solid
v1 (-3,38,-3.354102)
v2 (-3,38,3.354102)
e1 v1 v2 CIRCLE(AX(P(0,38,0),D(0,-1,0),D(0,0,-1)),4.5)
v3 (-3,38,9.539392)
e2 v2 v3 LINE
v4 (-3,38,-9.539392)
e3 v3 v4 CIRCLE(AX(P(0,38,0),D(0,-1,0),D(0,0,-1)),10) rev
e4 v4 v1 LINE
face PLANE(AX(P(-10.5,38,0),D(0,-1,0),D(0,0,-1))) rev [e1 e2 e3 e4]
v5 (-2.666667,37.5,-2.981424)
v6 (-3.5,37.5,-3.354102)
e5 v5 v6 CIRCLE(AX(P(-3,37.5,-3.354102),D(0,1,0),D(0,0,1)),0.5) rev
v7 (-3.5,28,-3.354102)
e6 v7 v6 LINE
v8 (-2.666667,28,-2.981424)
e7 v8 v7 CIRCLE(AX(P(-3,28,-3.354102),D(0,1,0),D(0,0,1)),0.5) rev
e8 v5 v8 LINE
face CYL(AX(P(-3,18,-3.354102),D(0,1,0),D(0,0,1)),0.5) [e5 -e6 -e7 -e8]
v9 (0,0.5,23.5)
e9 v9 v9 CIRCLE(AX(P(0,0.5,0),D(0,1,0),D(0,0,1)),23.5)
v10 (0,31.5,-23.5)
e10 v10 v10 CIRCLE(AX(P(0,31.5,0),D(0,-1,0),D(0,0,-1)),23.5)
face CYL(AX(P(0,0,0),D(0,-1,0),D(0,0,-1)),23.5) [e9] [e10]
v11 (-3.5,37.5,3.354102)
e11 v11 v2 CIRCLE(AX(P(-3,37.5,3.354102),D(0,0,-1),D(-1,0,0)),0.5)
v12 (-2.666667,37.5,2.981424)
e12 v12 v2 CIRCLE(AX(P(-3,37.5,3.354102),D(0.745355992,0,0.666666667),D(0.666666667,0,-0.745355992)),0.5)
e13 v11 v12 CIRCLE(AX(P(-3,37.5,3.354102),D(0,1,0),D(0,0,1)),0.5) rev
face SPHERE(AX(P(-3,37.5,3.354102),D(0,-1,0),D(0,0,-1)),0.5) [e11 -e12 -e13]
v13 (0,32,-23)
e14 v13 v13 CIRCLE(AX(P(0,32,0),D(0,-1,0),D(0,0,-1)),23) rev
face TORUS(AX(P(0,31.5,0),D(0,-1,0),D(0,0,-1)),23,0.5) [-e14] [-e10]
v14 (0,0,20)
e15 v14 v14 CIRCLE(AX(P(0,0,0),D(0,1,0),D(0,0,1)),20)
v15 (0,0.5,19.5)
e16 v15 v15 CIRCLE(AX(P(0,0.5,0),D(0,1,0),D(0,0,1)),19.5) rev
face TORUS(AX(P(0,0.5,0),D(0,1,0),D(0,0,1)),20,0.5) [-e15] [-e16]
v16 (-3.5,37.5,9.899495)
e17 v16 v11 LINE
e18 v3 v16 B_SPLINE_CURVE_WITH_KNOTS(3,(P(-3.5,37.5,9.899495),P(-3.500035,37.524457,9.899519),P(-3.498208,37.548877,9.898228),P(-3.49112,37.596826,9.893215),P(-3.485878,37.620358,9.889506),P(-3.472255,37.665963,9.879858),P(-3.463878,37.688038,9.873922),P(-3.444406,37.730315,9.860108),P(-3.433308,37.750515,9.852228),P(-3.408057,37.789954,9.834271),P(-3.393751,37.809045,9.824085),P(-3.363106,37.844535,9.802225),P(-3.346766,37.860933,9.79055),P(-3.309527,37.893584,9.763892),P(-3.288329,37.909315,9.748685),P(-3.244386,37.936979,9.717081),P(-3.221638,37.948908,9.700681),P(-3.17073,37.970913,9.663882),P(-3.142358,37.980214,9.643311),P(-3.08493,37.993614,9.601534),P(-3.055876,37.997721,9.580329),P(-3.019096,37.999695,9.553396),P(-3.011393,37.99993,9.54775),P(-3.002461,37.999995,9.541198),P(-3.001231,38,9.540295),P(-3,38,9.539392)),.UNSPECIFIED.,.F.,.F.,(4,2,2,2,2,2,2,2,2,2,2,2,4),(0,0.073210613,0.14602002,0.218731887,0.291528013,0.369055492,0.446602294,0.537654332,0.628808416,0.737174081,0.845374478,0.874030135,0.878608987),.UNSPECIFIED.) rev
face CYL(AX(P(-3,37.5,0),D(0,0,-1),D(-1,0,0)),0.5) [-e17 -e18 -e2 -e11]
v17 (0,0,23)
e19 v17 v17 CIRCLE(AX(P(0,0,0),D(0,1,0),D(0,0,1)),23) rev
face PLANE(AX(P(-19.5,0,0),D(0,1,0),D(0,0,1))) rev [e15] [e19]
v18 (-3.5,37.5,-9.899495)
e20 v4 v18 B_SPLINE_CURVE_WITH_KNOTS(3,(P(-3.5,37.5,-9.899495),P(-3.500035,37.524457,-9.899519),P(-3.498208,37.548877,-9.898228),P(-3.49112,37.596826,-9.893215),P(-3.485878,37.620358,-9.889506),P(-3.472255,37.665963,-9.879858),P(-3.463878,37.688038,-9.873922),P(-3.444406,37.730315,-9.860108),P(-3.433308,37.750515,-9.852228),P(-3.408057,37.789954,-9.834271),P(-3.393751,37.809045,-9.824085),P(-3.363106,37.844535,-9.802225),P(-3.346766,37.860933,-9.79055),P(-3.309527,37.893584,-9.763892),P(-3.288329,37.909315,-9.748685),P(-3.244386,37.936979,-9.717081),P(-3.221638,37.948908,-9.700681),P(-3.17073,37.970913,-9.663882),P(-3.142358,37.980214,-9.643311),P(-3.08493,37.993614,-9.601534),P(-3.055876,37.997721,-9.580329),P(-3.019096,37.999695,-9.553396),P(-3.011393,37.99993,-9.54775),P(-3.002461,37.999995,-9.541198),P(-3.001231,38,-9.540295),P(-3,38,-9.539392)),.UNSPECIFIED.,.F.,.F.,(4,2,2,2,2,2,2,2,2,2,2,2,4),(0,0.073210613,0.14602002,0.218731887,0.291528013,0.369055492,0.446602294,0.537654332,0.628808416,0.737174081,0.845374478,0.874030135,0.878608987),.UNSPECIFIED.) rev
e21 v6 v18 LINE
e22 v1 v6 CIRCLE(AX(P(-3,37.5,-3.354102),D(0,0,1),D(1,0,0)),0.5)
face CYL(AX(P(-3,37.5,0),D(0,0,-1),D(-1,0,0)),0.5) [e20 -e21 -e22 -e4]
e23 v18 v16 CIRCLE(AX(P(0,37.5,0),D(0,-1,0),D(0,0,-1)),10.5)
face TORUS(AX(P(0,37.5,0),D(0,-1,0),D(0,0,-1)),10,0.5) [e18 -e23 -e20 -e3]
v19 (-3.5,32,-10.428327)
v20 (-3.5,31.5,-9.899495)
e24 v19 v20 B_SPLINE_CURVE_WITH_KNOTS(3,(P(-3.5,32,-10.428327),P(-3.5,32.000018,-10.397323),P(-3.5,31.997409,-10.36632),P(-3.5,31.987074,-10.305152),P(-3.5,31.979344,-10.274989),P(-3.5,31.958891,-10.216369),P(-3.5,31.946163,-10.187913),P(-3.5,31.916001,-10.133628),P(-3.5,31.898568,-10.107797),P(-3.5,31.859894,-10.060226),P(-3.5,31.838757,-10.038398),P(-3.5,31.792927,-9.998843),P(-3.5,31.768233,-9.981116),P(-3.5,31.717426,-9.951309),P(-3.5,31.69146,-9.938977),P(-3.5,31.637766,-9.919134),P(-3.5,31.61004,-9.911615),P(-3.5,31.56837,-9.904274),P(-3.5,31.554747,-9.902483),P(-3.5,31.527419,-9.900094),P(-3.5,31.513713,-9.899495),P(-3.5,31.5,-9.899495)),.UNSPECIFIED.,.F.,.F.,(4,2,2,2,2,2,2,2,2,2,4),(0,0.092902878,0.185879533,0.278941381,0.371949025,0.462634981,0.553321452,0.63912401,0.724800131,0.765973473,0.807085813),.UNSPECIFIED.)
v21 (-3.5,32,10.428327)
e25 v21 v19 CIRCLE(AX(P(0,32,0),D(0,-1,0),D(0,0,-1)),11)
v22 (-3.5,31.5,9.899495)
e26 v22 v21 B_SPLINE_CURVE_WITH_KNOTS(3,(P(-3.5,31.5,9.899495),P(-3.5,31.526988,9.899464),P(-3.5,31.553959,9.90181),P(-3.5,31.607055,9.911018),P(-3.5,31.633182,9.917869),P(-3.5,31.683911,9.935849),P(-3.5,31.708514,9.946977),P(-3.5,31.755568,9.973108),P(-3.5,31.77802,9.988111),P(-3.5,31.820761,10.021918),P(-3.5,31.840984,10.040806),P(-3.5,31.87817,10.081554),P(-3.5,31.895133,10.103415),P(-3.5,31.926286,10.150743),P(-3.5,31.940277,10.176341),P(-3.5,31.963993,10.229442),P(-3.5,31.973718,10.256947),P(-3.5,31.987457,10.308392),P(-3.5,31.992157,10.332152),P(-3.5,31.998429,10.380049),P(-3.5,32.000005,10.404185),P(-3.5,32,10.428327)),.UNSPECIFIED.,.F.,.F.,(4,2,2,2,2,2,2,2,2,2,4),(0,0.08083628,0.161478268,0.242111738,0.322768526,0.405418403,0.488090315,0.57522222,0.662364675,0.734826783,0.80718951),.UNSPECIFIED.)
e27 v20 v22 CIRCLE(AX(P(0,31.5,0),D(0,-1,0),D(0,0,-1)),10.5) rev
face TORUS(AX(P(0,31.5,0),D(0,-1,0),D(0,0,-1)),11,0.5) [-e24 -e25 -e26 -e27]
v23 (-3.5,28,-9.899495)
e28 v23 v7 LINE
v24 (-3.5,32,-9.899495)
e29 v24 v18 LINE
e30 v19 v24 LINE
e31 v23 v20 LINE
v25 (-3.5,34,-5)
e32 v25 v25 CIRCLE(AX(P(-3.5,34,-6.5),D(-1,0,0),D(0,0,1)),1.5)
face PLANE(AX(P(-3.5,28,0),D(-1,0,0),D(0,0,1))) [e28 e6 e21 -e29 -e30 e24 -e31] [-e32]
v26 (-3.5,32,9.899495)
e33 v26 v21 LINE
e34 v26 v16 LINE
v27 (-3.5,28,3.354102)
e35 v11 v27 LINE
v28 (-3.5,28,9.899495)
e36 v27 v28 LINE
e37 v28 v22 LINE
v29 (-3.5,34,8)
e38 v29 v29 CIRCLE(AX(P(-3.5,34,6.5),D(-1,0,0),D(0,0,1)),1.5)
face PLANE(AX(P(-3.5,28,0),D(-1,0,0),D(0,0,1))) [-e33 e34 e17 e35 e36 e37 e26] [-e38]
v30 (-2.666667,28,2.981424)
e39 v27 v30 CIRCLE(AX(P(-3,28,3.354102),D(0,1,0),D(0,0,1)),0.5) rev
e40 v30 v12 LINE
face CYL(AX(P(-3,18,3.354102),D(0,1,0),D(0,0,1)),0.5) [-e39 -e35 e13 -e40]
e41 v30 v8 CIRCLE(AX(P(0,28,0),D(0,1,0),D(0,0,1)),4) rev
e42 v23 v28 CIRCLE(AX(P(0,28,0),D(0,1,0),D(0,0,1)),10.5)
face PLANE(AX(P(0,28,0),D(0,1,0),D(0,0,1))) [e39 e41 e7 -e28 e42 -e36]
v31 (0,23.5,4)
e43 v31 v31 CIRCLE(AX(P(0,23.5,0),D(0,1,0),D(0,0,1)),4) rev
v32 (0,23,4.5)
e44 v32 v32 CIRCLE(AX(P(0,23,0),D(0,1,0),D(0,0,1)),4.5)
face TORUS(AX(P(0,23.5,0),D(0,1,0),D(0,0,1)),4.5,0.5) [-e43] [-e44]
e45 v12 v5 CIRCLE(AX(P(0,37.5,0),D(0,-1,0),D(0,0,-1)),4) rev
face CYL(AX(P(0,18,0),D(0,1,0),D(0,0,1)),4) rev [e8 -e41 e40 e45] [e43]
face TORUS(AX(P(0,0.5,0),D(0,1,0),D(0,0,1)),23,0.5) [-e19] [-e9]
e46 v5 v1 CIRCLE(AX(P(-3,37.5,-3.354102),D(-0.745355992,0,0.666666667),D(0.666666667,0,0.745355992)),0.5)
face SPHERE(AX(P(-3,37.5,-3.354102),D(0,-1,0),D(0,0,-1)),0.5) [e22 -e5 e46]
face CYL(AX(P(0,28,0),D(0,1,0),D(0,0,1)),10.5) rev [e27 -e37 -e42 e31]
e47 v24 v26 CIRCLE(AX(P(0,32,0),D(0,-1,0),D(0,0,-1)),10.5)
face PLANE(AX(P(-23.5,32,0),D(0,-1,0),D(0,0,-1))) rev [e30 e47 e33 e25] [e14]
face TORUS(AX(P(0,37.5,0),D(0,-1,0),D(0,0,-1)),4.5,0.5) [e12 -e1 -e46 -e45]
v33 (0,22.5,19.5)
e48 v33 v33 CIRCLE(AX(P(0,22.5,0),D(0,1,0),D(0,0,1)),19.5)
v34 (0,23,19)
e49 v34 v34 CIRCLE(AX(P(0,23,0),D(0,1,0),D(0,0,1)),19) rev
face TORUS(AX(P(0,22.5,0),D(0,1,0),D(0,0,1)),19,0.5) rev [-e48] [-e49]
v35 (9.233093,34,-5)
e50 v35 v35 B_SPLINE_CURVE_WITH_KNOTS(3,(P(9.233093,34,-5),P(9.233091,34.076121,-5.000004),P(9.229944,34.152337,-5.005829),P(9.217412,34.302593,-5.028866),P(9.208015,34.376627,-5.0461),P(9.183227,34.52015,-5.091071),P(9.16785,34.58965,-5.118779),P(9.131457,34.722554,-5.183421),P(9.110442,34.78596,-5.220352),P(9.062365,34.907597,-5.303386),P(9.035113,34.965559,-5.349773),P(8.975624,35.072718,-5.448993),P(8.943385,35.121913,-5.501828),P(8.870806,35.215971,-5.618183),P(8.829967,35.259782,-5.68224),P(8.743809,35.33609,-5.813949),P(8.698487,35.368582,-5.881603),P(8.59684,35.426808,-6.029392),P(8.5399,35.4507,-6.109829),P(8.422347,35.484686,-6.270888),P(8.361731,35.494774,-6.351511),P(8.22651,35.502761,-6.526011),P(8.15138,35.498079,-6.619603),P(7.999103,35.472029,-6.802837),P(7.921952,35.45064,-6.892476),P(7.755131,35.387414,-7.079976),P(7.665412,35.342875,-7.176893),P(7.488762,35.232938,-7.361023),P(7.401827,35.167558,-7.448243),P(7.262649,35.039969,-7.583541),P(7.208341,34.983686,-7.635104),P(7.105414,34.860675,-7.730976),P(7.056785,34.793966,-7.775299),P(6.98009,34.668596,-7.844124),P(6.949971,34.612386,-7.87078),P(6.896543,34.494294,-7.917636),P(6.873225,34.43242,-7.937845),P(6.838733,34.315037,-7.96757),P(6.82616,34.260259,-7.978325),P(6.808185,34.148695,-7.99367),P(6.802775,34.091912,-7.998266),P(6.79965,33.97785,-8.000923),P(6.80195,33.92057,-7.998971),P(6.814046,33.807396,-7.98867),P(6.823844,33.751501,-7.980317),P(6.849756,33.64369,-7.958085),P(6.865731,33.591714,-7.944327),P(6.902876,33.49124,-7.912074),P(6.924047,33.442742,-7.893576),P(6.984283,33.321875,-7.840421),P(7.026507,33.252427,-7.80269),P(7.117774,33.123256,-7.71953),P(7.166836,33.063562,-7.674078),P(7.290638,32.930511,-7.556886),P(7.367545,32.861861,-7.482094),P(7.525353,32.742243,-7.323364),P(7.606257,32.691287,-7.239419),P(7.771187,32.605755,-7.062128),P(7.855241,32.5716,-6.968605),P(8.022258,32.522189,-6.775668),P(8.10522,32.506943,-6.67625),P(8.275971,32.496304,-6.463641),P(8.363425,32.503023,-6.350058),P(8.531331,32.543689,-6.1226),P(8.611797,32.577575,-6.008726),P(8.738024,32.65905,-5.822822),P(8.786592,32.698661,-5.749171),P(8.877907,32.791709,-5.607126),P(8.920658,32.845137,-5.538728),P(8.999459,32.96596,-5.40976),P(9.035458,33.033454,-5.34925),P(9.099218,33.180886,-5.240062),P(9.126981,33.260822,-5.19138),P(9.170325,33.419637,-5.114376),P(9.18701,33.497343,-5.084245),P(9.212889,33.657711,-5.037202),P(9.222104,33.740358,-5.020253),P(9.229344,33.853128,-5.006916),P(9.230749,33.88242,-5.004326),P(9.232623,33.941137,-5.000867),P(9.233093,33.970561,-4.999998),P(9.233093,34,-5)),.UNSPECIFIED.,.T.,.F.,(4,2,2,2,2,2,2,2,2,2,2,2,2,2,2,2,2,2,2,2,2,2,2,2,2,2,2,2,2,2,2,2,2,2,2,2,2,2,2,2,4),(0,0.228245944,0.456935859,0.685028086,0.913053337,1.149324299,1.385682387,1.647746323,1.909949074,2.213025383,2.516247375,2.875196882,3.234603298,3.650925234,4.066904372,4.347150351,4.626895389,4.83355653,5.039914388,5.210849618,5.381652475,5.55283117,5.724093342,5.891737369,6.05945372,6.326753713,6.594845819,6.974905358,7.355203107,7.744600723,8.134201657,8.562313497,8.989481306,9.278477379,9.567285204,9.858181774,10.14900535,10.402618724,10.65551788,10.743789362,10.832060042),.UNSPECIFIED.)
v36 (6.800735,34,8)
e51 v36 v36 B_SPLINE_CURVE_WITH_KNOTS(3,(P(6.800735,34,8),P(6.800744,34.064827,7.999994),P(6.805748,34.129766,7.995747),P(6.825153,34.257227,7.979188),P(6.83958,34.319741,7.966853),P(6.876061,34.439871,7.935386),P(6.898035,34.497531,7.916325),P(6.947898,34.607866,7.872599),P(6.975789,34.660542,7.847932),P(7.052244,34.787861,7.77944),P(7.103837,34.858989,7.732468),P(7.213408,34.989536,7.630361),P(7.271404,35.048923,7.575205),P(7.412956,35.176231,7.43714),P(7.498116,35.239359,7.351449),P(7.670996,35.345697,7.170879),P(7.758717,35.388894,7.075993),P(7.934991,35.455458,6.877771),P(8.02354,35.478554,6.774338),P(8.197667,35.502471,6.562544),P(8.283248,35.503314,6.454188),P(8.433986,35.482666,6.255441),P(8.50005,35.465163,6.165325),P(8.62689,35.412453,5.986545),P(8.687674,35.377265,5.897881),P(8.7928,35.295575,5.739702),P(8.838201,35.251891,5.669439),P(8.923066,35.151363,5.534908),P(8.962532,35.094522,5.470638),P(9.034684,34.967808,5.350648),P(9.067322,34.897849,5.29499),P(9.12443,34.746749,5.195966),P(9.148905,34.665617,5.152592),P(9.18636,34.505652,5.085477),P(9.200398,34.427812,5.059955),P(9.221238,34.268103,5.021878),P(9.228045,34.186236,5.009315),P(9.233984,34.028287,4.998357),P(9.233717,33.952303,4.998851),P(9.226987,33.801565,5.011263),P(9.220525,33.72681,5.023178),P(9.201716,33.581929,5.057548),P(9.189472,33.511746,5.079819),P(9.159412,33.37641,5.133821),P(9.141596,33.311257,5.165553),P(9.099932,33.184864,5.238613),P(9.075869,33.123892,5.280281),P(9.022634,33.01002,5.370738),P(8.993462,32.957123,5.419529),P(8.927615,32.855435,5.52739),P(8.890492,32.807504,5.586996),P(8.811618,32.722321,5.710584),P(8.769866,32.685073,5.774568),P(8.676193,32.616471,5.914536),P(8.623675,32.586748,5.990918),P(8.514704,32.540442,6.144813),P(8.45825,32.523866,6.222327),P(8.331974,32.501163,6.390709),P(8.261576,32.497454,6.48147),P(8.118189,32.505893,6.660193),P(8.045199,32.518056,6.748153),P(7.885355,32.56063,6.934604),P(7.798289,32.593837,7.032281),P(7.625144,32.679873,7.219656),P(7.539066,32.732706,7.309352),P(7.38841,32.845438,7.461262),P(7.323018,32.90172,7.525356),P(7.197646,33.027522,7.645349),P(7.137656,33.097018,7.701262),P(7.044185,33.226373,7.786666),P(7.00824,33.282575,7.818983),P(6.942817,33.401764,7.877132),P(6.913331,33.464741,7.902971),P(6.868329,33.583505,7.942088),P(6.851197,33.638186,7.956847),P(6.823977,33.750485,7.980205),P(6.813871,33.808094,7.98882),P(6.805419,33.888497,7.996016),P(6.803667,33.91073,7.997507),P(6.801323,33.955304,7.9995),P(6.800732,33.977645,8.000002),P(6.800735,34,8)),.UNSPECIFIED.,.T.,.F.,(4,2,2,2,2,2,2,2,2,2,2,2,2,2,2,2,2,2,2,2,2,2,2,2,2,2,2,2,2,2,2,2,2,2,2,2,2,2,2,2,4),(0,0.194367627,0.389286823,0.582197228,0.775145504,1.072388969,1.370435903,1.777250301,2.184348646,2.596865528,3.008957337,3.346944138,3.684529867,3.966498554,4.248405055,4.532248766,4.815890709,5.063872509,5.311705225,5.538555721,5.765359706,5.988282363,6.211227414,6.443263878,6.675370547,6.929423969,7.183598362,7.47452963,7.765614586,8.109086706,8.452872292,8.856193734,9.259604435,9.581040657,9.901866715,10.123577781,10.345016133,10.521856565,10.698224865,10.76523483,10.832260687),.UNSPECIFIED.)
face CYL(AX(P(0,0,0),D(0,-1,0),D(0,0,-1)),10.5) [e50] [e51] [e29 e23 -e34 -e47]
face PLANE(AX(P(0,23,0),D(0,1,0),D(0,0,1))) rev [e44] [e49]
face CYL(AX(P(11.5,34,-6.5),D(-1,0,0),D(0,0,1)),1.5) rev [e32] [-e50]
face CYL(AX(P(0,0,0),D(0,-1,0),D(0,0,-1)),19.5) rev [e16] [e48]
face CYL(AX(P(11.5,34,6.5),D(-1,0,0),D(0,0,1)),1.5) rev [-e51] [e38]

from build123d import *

# Parameters (mm, degrees)
ESQUISSE2_R             = 4
ENL_V_MAT_EXTRU_1_DEPTH = 20
ENL_V_MAT_EXTRU_2_DEPTH = 10
ESQUISSE5_R             = 1.5
ENL_V_MAT_EXTRU_3_DEPTH = 15
CONG_1_R                = 0.5
CONG_2_R                = 0.5


with BuildPart() as part:
    # Esquisse1 → Révolution1 (revolve)
    with BuildSketch(Plane.XY, mode=Mode.PRIVATE) as r_volution1_sk:
        Polygon((-19.5, 0), (-23.5, 0), (-23.5, 32), (-10.5, 32), (-10.5, 38), (0, 38), (0, 23), (-19.5, 23), align=None)
    revolve(r_volution1_sk.sketch.rotate(Axis((0, 0, 0), (0, 1, 0)), 270), axis=Axis((0, 0, 0), (0, 1, 0)))

    # Esquisse2 → Enlèv. mat.-Extru.1 (cut)
    with BuildSketch(Plane(origin=(0, 38, 0), x_dir=(1, 0, 0), z_dir=(0, 1, 0))):
        with Locations(Location((0, 0, 0), (0, 0, 270))):
            Circle(ESQUISSE2_R)
    extrude(amount=-ENL_V_MAT_EXTRU_1_DEPTH, mode=Mode.SUBTRACT)

    # Esquisse3 → Enlèv. mat.-Extru.2 (cut)
    with BuildSketch(Plane(origin=(0, 38, 0), x_dir=(1, 0, 0), z_dir=(0, 1, 0))):
        with BuildLine():
            Line((-3.5, 1.936491673), (-3.5, 9.899494937))
            ThreePointArc((-3.5, 9.899494937), (-10.5, 0), (-3.5, -9.899494937))
            Line((-3.5, -9.899494937), (-3.5, -1.936491673))
            ThreePointArc((-3.5, -1.936491673), (-4, 0), (-3.5, 1.936491673))
        make_face()
    extrude(amount=-ENL_V_MAT_EXTRU_2_DEPTH, mode=Mode.SUBTRACT)

    # Esquisse5 → Enlèv. mat.-Extru.3 (cut)
    with BuildSketch(Plane.ZY.offset(3.5)):
        with Locations((-6.5, 34)):
            Circle(ESQUISSE5_R)
        with Locations((6.5, 34)):
            Circle(ESQUISSE5_R)
    extrude(amount=-ENL_V_MAT_EXTRU_3_DEPTH, mode=Mode.SUBTRACT)

    # Congé1
    cong_1_edges = [part.edges().sort_by_distance(p)[0] for p in [
        (-3.5, 33, -1.936491673),
        (-3.5, 33, 1.936491673),
    ]]
    fillet(cong_1_edges, radius=CONG_1_R)

    # Congé2
    # the kernel refuses this fillet: 0.5 mm, written as the material it adds along each edge
    with BuildSketch(Plane(origin=(0, 23, 0), x_dir=(0, 0, -1), z_dir=(1, 0, 0))) as cong_2_piece_1:
        with BuildLine():
            CenterArc((19.5 - CONG_2_R, -CONG_2_R), CONG_2_R, 0, 90)
            Line((19.5 - CONG_2_R, 0), (19.5, 0))
            Line((19.5, 0), (19.5, -CONG_2_R))
        make_face()
    revolve(axis=Axis((0, 23, 0), (0, 1, 0)))
    # the kernel refuses this fillet: 0.5 mm, written as the material it takes off along each edge
    with BuildSketch(Plane(origin=(0, 23, 0), x_dir=(0, 0, 1), z_dir=(-1, 0, 0))) as cong_2_2_piece_1:
        with BuildLine():
            CenterArc((4 + CONG_2_R, CONG_2_R), CONG_2_R, 180, 90)
            Line((4 + CONG_2_R, 0), (4, 0))
            Line((4, 0), (4, CONG_2_R))
        make_face()
    revolve(axis=Axis((0, 23, 0), (0, 1, 0)), mode=Mode.SUBTRACT)
    with BuildSketch(Plane(origin=(0, 38, 0), x_dir=(-0.4432023779000481, 0, -0.8964215817480875), z_dir=(-0.8964215817480875, 0, 0.4432023779000481))) as cong_2_2_piece_2:
        with BuildLine():
            CenterArc((10.5 - CONG_2_R, CONG_2_R), CONG_2_R, 270, 90)
            Line((10.5, CONG_2_R), (10.5, 0))
            Line((10.5, 0), (10.5 - CONG_2_R, 0))
        make_face()
    revolve(axis=Axis((0, 38, 0), (0, -1, 0)), revolution_arc=232.616769328, mode=Mode.SUBTRACT)
    with BuildSketch(Plane(origin=(-3.5, 38, -3.354101966), x_dir=(1, 0, 0), z_dir=(0, 0, -1)), Plane(origin=(-3.5, 38, 11.149494937), x_dir=(1, 0, 0), z_dir=(0, 0, -1))) as cong_2_2_piece_3:
        with BuildLine():
            CenterArc((CONG_2_R, CONG_2_R), CONG_2_R, 180, 90)
            Line((0, CONG_2_R), (0, 0))
            Line((0, 0), (CONG_2_R, 0))
        make_face()
    extrude(amount=7.79539297, mode=Mode.SUBTRACT)
    with BuildSketch(Plane(origin=(0, 38, 0), x_dir=(0, 0, 1), z_dir=(-1, 0, 0))) as cong_2_2_piece_4:
        with BuildLine():
            CenterArc((4 + CONG_2_R, -CONG_2_R), CONG_2_R, 90, 90)
            Line((4 + CONG_2_R, 0), (4, 0))
            Line((4, 0), (4, -CONG_2_R))
        make_face()
    revolve(axis=Axis((0, 38, 0), (0, 1, 0)), revolution_arc=221.810314896, mode=Mode.SUBTRACT)
    with BuildSketch(Plane(origin=(-3, 38, -3.354101966), x_dir=(0.6666666666666691, 0, 0.7453559924999279), z_dir=(0.7453559924999279, 0, -0.6666666666666691))) as cong_2_2_piece_5:
        with BuildLine():
            CenterArc((0.5 - CONG_2_R, CONG_2_R), CONG_2_R, 270, 90)
            Line((0.5, CONG_2_R), (0.5, 0))
            Line((0.5, 0), (0.5 - CONG_2_R, 0))
        make_face()
    revolve(axis=Axis((-3, 38, -3.354101966), (0, -1, 0)), revolution_arc=131.810314896, mode=Mode.SUBTRACT)
    with BuildSketch(Plane(origin=(-3, 38, 3.354101966), x_dir=(0.6666666666666634, 0, -0.7453559924999329), z_dir=(0.7453559924999329, 0, 0.6666666666666634))) as cong_2_2_piece_6:
        with BuildLine():
            CenterArc((0.5 - CONG_2_R, -CONG_2_R), CONG_2_R, 0, 90)
            Line((0.5, -CONG_2_R), (0.5, 0))
            Line((0.5, 0), (0.5 - CONG_2_R, 0))
        make_face()
    revolve(axis=Axis((-3, 38, 3.354101966), (0, 1, 0)), revolution_arc=131.810314896, mode=Mode.SUBTRACT)
    with BuildSketch(Plane(origin=(0, 0, 0), x_dir=(0, 0, -1), z_dir=(1, 0, 0))) as cong_2_2_piece_7:
        with BuildLine():
            CenterArc((23.5 - CONG_2_R, CONG_2_R), CONG_2_R, 270, 90)
            Line((23.5 - CONG_2_R, 0), (23.5, 0))
            Line((23.5, 0), (23.5, CONG_2_R))
        make_face()
    revolve(axis=Axis((0, 0, 0), (0, 1, 0)), mode=Mode.SUBTRACT)
    with BuildSketch(Plane(origin=(0, 0, 0), x_dir=(0, 0, -1), z_dir=(1, 0, 0))) as cong_2_2_piece_8:
        with BuildLine():
            CenterArc((19.5 + CONG_2_R, CONG_2_R), CONG_2_R, 180, 90)
            Line((19.5 + CONG_2_R, 0), (19.5, 0))
            Line((19.5, 0), (19.5, CONG_2_R))
        make_face()
    revolve(axis=Axis((0, 0, 0), (0, 1, 0)), mode=Mode.SUBTRACT)
    with BuildSketch(Plane(origin=(0, 32, 0), x_dir=(-0.21888515145159862, 0, -0.9757506292460234), z_dir=(0.9757506292460234, 0, -0.21888515145159862))) as cong_2_2_piece_9_section:
        with BuildLine():
            CenterArc((10.5 + CONG_2_R, -CONG_2_R), CONG_2_R, 90, 90)
            Line((10.5 + CONG_2_R, 0), (10.5, 0))
            Line((10.5, 0), (10.5, -CONG_2_R))
        make_face()
    cong_2_2_piece_9 = revolve(axis=Axis((0, 32, 0), (0, 1, 0)), revolution_arc=154.712877956, mode=Mode.PRIVATE)
    cong_2_2_piece_9 = split(cong_2_2_piece_9, bisect_by=Plane(origin=(-3.5, 31.86147473, 0), z_dir=(-1, 0, 0)), keep=Keep.TOP, mode=Mode.PRIVATE)
    add(cong_2_2_piece_9, mode=Mode.SUBTRACT)
    with BuildSketch(Plane(origin=(0, 32, 0), x_dir=(0, 0, -1), z_dir=(1, 0, 0))) as cong_2_2_piece_10:
        with BuildLine():
            CenterArc((23.5 - CONG_2_R, -CONG_2_R), CONG_2_R, 0, 90)
            Line((23.5, -CONG_2_R), (23.5, 0))
            Line((23.5, 0), (23.5 - CONG_2_R, 0))
        make_face()
    revolve(axis=Axis((0, 32, 0), (0, 1, 0)), mode=Mode.SUBTRACT)
    with BuildSketch(Plane(origin=(0, 38, 0), x_dir=(-0.6666666666666664, 0, 0.7453559924999301), z_dir=(-0.7453559924999301, 0, -0.6666666666666664))) as cong_2_2_piece_11:
        with BuildLine():
            CenterArc((4 + CONG_2_R, -CONG_2_R), CONG_2_R, 90, 90)
            Line((4 + CONG_2_R, 0), (4, 0))
            Line((4, 0), (4, -CONG_2_R))
        make_face()
    revolve(axis=Axis((0, 38, 0), (0, 1, 0)), revolution_arc=41.810314896, mode=Mode.SUBTRACT)


solid = part.part
